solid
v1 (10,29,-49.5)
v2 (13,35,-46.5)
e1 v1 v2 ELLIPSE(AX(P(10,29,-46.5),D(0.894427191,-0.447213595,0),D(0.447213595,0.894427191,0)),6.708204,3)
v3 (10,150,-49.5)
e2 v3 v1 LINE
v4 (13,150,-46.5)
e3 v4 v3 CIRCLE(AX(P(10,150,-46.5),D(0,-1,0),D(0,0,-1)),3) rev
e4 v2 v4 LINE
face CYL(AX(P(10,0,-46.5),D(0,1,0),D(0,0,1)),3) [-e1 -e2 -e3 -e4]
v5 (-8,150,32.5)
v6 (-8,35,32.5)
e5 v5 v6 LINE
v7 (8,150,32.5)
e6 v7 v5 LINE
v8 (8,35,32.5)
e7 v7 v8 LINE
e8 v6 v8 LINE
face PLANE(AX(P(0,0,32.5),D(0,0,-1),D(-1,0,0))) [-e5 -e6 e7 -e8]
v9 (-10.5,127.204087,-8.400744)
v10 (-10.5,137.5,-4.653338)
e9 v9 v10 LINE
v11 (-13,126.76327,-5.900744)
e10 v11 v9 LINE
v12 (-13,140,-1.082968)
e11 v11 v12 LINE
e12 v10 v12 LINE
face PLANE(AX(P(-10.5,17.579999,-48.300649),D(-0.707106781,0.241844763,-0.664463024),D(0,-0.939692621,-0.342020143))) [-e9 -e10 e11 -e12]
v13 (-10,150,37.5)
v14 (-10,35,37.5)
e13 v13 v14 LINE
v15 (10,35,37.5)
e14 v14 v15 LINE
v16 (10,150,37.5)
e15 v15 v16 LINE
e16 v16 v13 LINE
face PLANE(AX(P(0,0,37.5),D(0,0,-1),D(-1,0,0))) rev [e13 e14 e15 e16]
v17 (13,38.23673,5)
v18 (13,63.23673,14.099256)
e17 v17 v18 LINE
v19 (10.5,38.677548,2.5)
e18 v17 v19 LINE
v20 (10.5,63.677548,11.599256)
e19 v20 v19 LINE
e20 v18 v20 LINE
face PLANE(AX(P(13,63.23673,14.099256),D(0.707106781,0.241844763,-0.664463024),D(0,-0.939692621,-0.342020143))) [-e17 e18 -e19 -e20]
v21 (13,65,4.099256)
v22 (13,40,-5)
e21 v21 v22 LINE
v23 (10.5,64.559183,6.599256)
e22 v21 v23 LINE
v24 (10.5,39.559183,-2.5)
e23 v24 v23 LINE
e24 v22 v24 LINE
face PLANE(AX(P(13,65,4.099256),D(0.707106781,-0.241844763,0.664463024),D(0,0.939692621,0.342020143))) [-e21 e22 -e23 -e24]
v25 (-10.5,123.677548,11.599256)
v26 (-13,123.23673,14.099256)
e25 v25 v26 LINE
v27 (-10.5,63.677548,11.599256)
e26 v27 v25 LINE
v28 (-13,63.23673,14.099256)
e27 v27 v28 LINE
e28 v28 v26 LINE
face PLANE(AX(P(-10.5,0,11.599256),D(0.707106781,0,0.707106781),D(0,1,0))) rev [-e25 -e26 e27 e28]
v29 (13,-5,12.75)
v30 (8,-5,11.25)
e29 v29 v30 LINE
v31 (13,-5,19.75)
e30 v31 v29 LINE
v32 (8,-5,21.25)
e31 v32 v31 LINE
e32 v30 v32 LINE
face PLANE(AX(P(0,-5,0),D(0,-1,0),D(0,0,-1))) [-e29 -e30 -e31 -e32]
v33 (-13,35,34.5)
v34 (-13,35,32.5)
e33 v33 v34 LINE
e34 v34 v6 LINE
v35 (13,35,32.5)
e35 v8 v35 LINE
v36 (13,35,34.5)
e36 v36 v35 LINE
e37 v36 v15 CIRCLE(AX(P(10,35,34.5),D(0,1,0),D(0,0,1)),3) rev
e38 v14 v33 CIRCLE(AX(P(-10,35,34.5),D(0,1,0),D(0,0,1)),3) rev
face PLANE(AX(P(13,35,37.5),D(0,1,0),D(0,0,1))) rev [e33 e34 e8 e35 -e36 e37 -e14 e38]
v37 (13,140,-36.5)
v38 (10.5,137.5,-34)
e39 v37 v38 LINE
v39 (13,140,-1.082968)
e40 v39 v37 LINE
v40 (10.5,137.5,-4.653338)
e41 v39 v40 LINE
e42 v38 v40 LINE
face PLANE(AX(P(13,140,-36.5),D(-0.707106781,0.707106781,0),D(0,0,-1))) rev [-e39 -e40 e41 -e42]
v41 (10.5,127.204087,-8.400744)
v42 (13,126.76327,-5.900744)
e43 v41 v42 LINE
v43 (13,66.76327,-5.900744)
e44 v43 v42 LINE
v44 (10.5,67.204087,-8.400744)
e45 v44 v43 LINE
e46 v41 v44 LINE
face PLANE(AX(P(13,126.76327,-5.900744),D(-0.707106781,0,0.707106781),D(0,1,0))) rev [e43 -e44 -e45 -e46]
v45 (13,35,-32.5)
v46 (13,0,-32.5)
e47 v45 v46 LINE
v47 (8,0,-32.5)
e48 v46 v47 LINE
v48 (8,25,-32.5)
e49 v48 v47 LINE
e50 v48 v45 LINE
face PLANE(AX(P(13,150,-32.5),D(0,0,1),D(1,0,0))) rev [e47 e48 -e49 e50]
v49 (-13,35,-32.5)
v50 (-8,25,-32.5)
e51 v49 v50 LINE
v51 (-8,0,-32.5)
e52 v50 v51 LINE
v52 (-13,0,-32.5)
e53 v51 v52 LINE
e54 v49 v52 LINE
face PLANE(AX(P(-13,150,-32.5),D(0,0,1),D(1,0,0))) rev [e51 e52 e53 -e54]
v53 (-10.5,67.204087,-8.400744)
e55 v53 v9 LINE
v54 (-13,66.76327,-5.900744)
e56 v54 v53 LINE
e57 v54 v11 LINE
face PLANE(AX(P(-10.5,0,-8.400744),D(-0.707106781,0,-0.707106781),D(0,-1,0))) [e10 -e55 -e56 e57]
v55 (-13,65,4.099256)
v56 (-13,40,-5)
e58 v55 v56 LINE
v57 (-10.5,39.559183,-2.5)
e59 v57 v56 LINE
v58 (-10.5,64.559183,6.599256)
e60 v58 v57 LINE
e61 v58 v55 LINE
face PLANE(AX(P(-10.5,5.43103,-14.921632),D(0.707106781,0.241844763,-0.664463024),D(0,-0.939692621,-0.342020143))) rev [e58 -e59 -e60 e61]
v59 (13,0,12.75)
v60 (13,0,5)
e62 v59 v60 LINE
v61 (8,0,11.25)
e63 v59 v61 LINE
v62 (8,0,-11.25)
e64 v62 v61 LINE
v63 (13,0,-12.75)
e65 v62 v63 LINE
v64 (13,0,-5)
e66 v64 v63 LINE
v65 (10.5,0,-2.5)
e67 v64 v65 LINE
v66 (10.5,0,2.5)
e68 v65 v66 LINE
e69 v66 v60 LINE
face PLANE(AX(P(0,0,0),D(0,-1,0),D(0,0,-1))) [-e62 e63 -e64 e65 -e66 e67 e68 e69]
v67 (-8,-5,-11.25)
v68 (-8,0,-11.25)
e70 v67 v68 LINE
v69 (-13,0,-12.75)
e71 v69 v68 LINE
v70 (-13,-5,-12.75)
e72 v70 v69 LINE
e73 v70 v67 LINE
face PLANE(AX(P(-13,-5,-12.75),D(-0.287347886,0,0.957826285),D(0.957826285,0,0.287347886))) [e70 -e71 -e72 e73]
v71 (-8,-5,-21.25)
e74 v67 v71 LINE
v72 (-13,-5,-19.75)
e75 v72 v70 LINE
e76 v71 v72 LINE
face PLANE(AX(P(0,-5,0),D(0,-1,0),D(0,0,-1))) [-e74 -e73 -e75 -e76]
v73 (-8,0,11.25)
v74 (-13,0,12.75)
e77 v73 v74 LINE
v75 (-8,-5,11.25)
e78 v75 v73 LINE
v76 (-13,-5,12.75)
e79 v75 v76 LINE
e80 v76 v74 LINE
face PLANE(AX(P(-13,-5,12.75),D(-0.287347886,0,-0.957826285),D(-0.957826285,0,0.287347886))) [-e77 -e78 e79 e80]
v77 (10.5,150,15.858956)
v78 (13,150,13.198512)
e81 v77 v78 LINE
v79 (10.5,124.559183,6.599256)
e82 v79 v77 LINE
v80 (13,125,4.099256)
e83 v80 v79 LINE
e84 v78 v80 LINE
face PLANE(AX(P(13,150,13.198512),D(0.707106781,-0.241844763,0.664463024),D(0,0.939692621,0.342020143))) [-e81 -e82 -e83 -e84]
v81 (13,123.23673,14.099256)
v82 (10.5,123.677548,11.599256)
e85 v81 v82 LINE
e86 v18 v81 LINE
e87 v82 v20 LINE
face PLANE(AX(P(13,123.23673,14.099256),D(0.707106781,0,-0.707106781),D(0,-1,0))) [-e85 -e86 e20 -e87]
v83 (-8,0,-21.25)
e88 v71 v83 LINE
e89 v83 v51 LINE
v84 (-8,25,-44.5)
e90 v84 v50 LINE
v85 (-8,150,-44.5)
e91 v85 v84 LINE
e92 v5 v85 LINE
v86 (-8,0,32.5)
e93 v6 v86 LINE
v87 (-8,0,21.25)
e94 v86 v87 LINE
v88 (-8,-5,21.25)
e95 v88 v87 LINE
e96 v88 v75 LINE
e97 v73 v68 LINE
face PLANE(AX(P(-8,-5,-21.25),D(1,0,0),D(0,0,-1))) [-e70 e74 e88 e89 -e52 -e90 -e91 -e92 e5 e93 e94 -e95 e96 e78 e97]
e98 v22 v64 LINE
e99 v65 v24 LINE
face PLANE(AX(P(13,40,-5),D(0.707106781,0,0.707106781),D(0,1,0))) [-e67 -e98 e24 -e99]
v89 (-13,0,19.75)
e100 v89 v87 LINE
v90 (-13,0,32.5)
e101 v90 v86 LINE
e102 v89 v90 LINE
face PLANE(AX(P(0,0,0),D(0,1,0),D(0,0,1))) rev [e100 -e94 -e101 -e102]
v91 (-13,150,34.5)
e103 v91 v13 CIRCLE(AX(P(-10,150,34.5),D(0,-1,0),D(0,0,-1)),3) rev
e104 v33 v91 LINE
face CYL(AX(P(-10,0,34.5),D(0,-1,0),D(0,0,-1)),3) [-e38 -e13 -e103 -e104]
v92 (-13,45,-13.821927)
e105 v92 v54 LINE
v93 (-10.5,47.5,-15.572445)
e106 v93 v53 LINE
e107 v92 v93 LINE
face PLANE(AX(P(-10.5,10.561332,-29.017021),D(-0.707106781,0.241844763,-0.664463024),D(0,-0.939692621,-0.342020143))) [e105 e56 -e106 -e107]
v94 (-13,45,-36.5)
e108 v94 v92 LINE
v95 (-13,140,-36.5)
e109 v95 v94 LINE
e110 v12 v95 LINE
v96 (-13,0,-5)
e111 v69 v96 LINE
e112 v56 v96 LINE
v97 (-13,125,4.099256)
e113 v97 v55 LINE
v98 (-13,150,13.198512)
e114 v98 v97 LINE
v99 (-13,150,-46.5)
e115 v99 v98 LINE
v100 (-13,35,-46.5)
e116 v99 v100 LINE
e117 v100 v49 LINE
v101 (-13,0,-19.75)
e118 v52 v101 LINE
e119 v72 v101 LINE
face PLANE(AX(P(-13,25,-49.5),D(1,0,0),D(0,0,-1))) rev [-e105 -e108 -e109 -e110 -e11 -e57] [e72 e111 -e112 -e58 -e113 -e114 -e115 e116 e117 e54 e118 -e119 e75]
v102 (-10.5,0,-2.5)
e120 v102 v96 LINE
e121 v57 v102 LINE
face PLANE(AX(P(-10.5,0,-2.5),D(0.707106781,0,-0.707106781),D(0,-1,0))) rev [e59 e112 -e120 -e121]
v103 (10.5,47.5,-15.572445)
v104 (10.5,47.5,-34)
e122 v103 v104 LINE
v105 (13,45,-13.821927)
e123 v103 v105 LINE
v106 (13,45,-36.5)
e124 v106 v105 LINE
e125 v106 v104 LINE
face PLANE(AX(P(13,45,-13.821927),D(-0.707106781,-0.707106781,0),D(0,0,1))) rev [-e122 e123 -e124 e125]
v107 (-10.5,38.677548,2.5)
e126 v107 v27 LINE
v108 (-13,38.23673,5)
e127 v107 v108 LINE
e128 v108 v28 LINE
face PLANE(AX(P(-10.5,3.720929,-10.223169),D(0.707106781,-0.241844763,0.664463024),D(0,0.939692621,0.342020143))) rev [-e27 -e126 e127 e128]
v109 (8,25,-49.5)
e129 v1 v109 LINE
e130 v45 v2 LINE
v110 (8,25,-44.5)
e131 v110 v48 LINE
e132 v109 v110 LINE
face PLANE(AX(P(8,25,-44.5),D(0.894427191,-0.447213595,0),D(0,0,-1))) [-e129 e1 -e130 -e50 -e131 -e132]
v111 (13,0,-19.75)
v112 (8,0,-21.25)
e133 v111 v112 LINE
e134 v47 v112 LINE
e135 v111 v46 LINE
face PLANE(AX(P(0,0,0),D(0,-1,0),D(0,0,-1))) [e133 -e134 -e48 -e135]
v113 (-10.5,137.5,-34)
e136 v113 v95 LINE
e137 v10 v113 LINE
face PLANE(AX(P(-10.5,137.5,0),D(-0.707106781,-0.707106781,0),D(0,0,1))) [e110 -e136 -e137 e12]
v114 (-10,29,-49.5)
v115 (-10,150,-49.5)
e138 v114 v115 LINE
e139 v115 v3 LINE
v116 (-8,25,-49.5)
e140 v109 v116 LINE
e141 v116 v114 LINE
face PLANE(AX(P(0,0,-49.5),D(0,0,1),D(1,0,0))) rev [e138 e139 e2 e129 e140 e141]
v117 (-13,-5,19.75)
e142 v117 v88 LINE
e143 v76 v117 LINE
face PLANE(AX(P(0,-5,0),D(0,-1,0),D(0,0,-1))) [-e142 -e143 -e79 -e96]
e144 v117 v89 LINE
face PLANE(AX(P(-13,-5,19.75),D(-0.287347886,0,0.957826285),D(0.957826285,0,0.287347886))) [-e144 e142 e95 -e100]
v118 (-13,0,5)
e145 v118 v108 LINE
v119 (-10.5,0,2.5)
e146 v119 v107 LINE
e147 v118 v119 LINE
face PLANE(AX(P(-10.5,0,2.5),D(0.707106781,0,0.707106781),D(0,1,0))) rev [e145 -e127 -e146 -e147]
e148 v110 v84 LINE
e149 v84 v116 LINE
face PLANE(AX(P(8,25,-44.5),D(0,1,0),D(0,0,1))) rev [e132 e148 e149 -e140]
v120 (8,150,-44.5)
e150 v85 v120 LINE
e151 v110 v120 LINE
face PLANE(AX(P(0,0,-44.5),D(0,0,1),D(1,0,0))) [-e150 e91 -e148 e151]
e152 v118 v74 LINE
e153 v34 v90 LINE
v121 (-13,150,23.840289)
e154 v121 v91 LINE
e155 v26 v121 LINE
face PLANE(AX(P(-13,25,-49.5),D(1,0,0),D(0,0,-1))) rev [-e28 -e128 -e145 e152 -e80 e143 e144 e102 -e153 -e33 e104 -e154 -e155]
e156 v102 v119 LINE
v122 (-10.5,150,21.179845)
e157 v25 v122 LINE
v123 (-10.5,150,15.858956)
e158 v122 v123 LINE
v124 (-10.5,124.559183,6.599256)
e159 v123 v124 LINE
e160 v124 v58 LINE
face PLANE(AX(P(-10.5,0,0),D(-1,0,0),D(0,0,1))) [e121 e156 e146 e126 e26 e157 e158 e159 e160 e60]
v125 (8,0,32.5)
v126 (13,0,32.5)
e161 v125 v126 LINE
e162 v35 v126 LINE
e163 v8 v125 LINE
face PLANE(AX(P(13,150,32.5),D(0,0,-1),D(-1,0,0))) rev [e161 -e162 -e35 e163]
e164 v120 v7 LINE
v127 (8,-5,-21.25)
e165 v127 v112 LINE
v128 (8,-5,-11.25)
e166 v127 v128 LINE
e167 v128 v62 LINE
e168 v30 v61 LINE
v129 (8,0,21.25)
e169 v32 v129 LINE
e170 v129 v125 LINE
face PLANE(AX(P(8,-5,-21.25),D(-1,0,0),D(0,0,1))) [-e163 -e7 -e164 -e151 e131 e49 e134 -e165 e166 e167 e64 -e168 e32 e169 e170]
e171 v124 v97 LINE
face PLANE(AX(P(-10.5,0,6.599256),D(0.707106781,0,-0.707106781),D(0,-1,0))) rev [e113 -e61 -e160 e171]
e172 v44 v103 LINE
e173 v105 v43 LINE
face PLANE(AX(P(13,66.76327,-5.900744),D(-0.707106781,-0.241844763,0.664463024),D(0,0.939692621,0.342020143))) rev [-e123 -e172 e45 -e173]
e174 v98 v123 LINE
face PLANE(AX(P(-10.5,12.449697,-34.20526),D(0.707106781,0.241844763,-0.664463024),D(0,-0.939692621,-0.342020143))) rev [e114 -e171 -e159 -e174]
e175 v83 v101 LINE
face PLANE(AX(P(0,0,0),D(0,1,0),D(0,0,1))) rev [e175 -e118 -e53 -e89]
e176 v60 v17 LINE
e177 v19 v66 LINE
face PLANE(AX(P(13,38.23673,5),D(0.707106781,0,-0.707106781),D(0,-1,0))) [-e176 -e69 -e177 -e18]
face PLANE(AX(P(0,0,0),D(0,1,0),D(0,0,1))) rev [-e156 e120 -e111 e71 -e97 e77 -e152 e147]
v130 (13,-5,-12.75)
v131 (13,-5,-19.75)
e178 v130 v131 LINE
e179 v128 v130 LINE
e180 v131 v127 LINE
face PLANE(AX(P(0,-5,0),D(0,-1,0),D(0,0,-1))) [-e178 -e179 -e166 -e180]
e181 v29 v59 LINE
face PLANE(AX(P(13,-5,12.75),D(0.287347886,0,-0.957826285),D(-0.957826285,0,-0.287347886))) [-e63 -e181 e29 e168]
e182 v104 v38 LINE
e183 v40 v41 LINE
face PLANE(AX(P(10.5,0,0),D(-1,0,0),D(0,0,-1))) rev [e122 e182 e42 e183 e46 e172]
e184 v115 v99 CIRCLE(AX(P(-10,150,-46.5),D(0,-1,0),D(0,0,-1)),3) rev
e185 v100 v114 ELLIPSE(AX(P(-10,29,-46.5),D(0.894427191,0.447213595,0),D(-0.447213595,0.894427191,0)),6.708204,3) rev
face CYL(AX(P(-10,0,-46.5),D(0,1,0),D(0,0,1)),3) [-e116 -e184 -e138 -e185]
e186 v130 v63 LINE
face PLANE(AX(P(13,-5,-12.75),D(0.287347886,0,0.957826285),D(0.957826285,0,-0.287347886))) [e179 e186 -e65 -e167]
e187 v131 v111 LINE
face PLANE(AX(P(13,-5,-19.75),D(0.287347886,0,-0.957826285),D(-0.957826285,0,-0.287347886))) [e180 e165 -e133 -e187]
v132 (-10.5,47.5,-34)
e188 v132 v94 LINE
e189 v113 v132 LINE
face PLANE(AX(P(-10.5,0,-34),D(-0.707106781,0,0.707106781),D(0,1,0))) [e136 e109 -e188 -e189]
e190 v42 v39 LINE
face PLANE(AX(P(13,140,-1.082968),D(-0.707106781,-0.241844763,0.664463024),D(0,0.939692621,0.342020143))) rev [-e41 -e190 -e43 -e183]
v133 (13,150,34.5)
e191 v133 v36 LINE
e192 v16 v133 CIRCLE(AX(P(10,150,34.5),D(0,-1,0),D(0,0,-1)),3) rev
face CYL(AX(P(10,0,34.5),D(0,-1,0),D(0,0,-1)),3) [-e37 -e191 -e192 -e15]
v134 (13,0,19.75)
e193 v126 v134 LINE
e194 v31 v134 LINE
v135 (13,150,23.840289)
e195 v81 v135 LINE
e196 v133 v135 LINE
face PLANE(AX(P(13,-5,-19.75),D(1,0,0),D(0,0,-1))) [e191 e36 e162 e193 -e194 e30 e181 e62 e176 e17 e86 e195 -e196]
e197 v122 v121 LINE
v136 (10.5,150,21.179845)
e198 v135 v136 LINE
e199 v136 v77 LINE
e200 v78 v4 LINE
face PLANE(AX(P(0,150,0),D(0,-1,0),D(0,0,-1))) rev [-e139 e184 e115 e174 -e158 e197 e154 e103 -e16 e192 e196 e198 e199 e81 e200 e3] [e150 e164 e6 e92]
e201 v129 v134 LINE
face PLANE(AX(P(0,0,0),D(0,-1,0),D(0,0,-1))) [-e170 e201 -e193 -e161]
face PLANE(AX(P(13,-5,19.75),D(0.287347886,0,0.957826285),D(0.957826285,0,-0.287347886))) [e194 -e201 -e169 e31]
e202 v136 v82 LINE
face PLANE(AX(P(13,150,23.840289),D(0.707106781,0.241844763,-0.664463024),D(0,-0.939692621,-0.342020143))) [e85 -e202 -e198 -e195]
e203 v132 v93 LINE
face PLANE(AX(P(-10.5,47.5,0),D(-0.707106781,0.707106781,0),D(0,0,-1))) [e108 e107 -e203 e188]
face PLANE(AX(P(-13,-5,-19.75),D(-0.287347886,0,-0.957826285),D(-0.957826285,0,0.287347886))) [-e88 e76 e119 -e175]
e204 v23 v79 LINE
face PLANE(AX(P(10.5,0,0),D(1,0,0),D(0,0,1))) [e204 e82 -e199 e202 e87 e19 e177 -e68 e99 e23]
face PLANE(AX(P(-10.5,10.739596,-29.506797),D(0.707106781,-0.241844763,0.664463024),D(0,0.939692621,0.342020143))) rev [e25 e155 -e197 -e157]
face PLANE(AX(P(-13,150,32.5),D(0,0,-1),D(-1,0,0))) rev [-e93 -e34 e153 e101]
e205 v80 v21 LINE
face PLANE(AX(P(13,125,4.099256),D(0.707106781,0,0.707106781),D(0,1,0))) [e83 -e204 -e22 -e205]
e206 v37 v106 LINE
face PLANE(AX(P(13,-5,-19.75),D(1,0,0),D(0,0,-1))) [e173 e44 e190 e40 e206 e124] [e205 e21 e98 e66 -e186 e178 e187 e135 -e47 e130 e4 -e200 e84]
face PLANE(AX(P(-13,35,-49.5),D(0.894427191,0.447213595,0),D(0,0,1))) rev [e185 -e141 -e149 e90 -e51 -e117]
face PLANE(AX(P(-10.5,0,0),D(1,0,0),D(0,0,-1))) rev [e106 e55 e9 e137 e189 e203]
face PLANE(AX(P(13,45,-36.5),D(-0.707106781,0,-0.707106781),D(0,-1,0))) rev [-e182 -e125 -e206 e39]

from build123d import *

# Parameters (mm, degrees)
BOSS_EXTRUDE1_DEPTH      = 5
BOSS_EXTRUDE1_2_DEPTH    = 5
BOSS_EXTRUDE1_3_DEPTH    = 5
BOSS_EXTRUDE1_4_DEPTH    = 5
SKETCH5_W                = 5
SKETCH5_H                = 65
BOSS_EXTRUDE6_DEPTH      = 150
SKETCH6_W                = 5
SKETCH6_H                = 125
BOSS_EXTRUDE7_DEPTH      = 12
SKETCH9_W                = 26
SKETCH9_H                = 125
BOSS_EXTRUDE9_DEPTH      = 5
SKETCH7_W                = 26
SKETCH7_H                = 115
BOSS_EXTRUDE8_DEPTH      = 5
CHAMFER1_SIZE            = 10
CHAMFER1_SIZE2           = 5
CHAMFER2_SIZE2           = 10
CHAMFER2_SIZE            = 5
FILLET1_R                = 3
CUT_EXTRUDE2_DEPTH       = 2.5
CUT_EXTRUDE3_DEPTH       = 2.5
CHAMFER3_SIZE            = 2.5
CHAMFER3_OF_MIRROR1_SIZE = 2.5


with BuildPart() as part:
    # Sketch1 → Boss-Extrude1 (new body)
    with BuildSketch(Plane(origin=(0, 0, 0), x_dir=(1, 0, 0), z_dir=(0, 1, 0))):
        Polygon((-13, 19.75), (-13, 12.75), (-8, 11.25), (-8, 21.25), align=None)
    extrude(amount=-BOSS_EXTRUDE1_DEPTH)



with BuildPart() as body_2:
    # Sketch1 → Boss-Extrude1 2 (new body)
    with BuildSketch(Plane(origin=(0, 0, 0), x_dir=(1, 0, 0), z_dir=(0, 1, 0))):
        Polygon((-13, -19.75), (-8, -21.25), (-8, -11.25), (-13, -12.75), align=None)
    extrude(amount=-BOSS_EXTRUDE1_2_DEPTH)


with BuildPart() as body_3:
    # Sketch1 → Boss-Extrude1 3 (new body)
    with BuildSketch(Plane(origin=(0, 0, 0), x_dir=(1, 0, 0), z_dir=(0, 1, 0))):
        Polygon((13, 19.75), (8, 21.25), (8, 11.25), (13, 12.75), align=None)
    extrude(amount=-BOSS_EXTRUDE1_3_DEPTH)


with BuildPart() as body_4:
    # Sketch1 → Boss-Extrude1 4 (new body)
    with BuildSketch(Plane(origin=(0, 0, 0), x_dir=(1, 0, 0), z_dir=(0, 1, 0))):
        Polygon((13, -19.75), (13, -12.75), (8, -11.25), (8, -21.25), align=None)
    extrude(amount=-BOSS_EXTRUDE1_4_DEPTH)


with BuildPart() as part_1:
    add(part.part)

    add(body_2.part)  # Boss-Extrude6 merges body 2

    add(body_3.part)  # Boss-Extrude6 merges body 3

    add(body_4.part)  # Boss-Extrude6 merges body 4
    # Sketch5 → Boss-Extrude6 (add)
    with BuildSketch(Plane(origin=(0, 0, 0), x_dir=(1, 0, 0), z_dir=(0, 1, 0))):
        with Locations((-10.5, 0)):
            Rectangle(SKETCH5_W, SKETCH5_H)
        with Locations((10.5, 0)):
            Rectangle(SKETCH5_W, SKETCH5_H)
    extrude(amount=BOSS_EXTRUDE6_DEPTH)

    # Sketch6 → Boss-Extrude7 (add)
    with BuildSketch(Plane(origin=(0, 0, -32.5), x_dir=(-1, 0, 0), z_dir=(0, 0, -1))):
        with Locations((-10.5, 87.5)):
            Rectangle(SKETCH6_W, SKETCH6_H)
        with Locations((10.5, 87.5)):
            Rectangle(SKETCH6_W, SKETCH6_H)
    extrude(amount=BOSS_EXTRUDE7_DEPTH)

    # Sketch9 → Boss-Extrude9 (add)
    with BuildSketch(Plane(origin=(0, 0, -44.5), x_dir=(-1, 0, 0), z_dir=(0, 0, -1))):
        with Locations((0, 87.5)):
            Rectangle(SKETCH9_W, SKETCH9_H)
    extrude(amount=BOSS_EXTRUDE9_DEPTH)

    # Sketch7 → Boss-Extrude8 (add)
    with BuildSketch(Plane.XY.offset(32.5)):
        with Locations((0, 92.5)):
            Rectangle(SKETCH7_W, SKETCH7_H)
    extrude(amount=BOSS_EXTRUDE8_DEPTH)

    # Chamfer1
    chamfer1_edges = [part_1.edges().sort_by_distance(p)[0] for p in [
        (13, 25, -41),
    ]]
    chamfer1_side = [part_1.faces().sort_by_distance(p)[0] for p in [
        (13, 77.49201278, -5.3514377),
    ]]
    chamfer(chamfer1_edges, length=CHAMFER1_SIZE, length2=CHAMFER1_SIZE2, reference=chamfer1_side[0])

    # Chamfer2
    chamfer2_edges = [part_1.edges().sort_by_distance(p)[0] for p in [
        (-13, 25, -41),
    ]]
    chamfer2_side = [part_1.faces().sort_by_distance(p)[0] for p in [
        (-12.9, 25, -41),
    ]]
    chamfer(chamfer2_edges, length=CHAMFER2_SIZE - 0.0001, length2=CHAMFER2_SIZE2 - 0.0001, reference=chamfer2_side[0])  # a hair under: the kernel refuses the full size

    # Fillet1
    fillet1_edges = [part_1.edges().sort_by_distance(p)[0] for p in [
        (-13, 92.49995, -49.5),
        (13, 92.5, -49.5),
        (13, 92.5, 37.5),
        (-13, 92.5, 37.5),
    ]]
    fillet(fillet1_edges, radius=FILLET1_R)

    # Sketch13 → Cut-Extrude2 (cut)
    with BuildSketch(Plane.ZY.offset(13)):
        Polygon((13.198511713, 150), (4.099255857, 125), (4.099255857, 65), (-5, 40), (-5, 0), (5, 0), (5, 38.236730193), (14.099255857, 63.236730193), (14.099255857, 123.236730193), (23.840289438, 150), align=None)
    cut_extrude2 = extrude(amount=-CUT_EXTRUDE2_DEPTH, mode=Mode.SUBTRACT)

    # Sketch15 → Cut-Extrude3 (cut)
    with BuildSketch(Plane.ZY.offset(13)):
        Polygon((-5.900744143, 66.763269807), (-13.821926553, 45), (-36.5, 45), (-36.5, 140), (-1.082968354, 140), (-5.900744143, 126.763269807), align=None)
    cut_extrude3 = extrude(amount=-CUT_EXTRUDE3_DEPTH, mode=Mode.SUBTRACT)

    # Chamfer3
    chamfer3_edges = [part_1.edges().sort_by_distance(p)[0] for p in [
        (-10.5, 136.618365096, 18.969772647),
        (-10.5, 93.236730193, 14.099255857),
        (-10.5, 50.736730193, 9.549627928),
        (-10.5, 19.118365096, 5),
        (-10.5, 20, -5),
        (-10.5, 52.5, -0.450372072),
        (-10.5, 95, 4.099255857),
        (-10.5, 137.5, 8.648883785),
        (-10.5, 45, -25.160963277),
        (-10.5, 55.881634904, -9.861335348),
        (-10.5, 96.763269807, -5.900744143),
        (-10.5, 133.381634904, -3.491856249),
        (-10.5, 92.5, -36.5),
        (-10.5, 140, -18.791484177),
    ]]
    chamfer(chamfer3_edges, length=CHAMFER3_SIZE - 0.0001)  # a hair under: the kernel refuses the full size

    # Mirror1: Cut-Extrude2, Cut-Extrude3 across plane
    add(cut_extrude2.mirror(Plane(origin=(0, 0, 0), x_dir=(0, 0, 1), z_dir=(1, 0, 0))), mode=Mode.SUBTRACT)
    add(cut_extrude3.mirror(Plane(origin=(0, 0, 0), x_dir=(0, 0, 1), z_dir=(1, 0, 0))), mode=Mode.SUBTRACT)

    # Chamfer3 of Mirror1
    chamfer3_of_mirror1_edges = [part_1.edges().sort_by_distance(p)[0] for p in [
        (10.5, 136.618365096, 18.969772647),
        (10.5, 93.236730193, 14.099255857),
        (10.5, 50.736730193, 9.549627928),
        (10.5, 19.118365096, 5),
        (10.5, 20, -5),
        (10.5, 52.5, -0.450372072),
        (10.5, 95, 4.099255857),
        (10.5, 137.5, 8.648883785),
        (10.5, 45, -25.160963277),
        (10.5, 55.881634904, -9.861335348),
        (10.5, 96.763269807, -5.900744143),
        (10.5, 133.381634904, -3.491856249),
        (10.5, 92.5, -36.5),
        (10.5, 140, -18.791484177),
    ]]
    chamfer(chamfer3_of_mirror1_edges, length=CHAMFER3_OF_MIRROR1_SIZE - 0.0001)  # a hair under: the kernel refuses the full size


solid = part_1.part
